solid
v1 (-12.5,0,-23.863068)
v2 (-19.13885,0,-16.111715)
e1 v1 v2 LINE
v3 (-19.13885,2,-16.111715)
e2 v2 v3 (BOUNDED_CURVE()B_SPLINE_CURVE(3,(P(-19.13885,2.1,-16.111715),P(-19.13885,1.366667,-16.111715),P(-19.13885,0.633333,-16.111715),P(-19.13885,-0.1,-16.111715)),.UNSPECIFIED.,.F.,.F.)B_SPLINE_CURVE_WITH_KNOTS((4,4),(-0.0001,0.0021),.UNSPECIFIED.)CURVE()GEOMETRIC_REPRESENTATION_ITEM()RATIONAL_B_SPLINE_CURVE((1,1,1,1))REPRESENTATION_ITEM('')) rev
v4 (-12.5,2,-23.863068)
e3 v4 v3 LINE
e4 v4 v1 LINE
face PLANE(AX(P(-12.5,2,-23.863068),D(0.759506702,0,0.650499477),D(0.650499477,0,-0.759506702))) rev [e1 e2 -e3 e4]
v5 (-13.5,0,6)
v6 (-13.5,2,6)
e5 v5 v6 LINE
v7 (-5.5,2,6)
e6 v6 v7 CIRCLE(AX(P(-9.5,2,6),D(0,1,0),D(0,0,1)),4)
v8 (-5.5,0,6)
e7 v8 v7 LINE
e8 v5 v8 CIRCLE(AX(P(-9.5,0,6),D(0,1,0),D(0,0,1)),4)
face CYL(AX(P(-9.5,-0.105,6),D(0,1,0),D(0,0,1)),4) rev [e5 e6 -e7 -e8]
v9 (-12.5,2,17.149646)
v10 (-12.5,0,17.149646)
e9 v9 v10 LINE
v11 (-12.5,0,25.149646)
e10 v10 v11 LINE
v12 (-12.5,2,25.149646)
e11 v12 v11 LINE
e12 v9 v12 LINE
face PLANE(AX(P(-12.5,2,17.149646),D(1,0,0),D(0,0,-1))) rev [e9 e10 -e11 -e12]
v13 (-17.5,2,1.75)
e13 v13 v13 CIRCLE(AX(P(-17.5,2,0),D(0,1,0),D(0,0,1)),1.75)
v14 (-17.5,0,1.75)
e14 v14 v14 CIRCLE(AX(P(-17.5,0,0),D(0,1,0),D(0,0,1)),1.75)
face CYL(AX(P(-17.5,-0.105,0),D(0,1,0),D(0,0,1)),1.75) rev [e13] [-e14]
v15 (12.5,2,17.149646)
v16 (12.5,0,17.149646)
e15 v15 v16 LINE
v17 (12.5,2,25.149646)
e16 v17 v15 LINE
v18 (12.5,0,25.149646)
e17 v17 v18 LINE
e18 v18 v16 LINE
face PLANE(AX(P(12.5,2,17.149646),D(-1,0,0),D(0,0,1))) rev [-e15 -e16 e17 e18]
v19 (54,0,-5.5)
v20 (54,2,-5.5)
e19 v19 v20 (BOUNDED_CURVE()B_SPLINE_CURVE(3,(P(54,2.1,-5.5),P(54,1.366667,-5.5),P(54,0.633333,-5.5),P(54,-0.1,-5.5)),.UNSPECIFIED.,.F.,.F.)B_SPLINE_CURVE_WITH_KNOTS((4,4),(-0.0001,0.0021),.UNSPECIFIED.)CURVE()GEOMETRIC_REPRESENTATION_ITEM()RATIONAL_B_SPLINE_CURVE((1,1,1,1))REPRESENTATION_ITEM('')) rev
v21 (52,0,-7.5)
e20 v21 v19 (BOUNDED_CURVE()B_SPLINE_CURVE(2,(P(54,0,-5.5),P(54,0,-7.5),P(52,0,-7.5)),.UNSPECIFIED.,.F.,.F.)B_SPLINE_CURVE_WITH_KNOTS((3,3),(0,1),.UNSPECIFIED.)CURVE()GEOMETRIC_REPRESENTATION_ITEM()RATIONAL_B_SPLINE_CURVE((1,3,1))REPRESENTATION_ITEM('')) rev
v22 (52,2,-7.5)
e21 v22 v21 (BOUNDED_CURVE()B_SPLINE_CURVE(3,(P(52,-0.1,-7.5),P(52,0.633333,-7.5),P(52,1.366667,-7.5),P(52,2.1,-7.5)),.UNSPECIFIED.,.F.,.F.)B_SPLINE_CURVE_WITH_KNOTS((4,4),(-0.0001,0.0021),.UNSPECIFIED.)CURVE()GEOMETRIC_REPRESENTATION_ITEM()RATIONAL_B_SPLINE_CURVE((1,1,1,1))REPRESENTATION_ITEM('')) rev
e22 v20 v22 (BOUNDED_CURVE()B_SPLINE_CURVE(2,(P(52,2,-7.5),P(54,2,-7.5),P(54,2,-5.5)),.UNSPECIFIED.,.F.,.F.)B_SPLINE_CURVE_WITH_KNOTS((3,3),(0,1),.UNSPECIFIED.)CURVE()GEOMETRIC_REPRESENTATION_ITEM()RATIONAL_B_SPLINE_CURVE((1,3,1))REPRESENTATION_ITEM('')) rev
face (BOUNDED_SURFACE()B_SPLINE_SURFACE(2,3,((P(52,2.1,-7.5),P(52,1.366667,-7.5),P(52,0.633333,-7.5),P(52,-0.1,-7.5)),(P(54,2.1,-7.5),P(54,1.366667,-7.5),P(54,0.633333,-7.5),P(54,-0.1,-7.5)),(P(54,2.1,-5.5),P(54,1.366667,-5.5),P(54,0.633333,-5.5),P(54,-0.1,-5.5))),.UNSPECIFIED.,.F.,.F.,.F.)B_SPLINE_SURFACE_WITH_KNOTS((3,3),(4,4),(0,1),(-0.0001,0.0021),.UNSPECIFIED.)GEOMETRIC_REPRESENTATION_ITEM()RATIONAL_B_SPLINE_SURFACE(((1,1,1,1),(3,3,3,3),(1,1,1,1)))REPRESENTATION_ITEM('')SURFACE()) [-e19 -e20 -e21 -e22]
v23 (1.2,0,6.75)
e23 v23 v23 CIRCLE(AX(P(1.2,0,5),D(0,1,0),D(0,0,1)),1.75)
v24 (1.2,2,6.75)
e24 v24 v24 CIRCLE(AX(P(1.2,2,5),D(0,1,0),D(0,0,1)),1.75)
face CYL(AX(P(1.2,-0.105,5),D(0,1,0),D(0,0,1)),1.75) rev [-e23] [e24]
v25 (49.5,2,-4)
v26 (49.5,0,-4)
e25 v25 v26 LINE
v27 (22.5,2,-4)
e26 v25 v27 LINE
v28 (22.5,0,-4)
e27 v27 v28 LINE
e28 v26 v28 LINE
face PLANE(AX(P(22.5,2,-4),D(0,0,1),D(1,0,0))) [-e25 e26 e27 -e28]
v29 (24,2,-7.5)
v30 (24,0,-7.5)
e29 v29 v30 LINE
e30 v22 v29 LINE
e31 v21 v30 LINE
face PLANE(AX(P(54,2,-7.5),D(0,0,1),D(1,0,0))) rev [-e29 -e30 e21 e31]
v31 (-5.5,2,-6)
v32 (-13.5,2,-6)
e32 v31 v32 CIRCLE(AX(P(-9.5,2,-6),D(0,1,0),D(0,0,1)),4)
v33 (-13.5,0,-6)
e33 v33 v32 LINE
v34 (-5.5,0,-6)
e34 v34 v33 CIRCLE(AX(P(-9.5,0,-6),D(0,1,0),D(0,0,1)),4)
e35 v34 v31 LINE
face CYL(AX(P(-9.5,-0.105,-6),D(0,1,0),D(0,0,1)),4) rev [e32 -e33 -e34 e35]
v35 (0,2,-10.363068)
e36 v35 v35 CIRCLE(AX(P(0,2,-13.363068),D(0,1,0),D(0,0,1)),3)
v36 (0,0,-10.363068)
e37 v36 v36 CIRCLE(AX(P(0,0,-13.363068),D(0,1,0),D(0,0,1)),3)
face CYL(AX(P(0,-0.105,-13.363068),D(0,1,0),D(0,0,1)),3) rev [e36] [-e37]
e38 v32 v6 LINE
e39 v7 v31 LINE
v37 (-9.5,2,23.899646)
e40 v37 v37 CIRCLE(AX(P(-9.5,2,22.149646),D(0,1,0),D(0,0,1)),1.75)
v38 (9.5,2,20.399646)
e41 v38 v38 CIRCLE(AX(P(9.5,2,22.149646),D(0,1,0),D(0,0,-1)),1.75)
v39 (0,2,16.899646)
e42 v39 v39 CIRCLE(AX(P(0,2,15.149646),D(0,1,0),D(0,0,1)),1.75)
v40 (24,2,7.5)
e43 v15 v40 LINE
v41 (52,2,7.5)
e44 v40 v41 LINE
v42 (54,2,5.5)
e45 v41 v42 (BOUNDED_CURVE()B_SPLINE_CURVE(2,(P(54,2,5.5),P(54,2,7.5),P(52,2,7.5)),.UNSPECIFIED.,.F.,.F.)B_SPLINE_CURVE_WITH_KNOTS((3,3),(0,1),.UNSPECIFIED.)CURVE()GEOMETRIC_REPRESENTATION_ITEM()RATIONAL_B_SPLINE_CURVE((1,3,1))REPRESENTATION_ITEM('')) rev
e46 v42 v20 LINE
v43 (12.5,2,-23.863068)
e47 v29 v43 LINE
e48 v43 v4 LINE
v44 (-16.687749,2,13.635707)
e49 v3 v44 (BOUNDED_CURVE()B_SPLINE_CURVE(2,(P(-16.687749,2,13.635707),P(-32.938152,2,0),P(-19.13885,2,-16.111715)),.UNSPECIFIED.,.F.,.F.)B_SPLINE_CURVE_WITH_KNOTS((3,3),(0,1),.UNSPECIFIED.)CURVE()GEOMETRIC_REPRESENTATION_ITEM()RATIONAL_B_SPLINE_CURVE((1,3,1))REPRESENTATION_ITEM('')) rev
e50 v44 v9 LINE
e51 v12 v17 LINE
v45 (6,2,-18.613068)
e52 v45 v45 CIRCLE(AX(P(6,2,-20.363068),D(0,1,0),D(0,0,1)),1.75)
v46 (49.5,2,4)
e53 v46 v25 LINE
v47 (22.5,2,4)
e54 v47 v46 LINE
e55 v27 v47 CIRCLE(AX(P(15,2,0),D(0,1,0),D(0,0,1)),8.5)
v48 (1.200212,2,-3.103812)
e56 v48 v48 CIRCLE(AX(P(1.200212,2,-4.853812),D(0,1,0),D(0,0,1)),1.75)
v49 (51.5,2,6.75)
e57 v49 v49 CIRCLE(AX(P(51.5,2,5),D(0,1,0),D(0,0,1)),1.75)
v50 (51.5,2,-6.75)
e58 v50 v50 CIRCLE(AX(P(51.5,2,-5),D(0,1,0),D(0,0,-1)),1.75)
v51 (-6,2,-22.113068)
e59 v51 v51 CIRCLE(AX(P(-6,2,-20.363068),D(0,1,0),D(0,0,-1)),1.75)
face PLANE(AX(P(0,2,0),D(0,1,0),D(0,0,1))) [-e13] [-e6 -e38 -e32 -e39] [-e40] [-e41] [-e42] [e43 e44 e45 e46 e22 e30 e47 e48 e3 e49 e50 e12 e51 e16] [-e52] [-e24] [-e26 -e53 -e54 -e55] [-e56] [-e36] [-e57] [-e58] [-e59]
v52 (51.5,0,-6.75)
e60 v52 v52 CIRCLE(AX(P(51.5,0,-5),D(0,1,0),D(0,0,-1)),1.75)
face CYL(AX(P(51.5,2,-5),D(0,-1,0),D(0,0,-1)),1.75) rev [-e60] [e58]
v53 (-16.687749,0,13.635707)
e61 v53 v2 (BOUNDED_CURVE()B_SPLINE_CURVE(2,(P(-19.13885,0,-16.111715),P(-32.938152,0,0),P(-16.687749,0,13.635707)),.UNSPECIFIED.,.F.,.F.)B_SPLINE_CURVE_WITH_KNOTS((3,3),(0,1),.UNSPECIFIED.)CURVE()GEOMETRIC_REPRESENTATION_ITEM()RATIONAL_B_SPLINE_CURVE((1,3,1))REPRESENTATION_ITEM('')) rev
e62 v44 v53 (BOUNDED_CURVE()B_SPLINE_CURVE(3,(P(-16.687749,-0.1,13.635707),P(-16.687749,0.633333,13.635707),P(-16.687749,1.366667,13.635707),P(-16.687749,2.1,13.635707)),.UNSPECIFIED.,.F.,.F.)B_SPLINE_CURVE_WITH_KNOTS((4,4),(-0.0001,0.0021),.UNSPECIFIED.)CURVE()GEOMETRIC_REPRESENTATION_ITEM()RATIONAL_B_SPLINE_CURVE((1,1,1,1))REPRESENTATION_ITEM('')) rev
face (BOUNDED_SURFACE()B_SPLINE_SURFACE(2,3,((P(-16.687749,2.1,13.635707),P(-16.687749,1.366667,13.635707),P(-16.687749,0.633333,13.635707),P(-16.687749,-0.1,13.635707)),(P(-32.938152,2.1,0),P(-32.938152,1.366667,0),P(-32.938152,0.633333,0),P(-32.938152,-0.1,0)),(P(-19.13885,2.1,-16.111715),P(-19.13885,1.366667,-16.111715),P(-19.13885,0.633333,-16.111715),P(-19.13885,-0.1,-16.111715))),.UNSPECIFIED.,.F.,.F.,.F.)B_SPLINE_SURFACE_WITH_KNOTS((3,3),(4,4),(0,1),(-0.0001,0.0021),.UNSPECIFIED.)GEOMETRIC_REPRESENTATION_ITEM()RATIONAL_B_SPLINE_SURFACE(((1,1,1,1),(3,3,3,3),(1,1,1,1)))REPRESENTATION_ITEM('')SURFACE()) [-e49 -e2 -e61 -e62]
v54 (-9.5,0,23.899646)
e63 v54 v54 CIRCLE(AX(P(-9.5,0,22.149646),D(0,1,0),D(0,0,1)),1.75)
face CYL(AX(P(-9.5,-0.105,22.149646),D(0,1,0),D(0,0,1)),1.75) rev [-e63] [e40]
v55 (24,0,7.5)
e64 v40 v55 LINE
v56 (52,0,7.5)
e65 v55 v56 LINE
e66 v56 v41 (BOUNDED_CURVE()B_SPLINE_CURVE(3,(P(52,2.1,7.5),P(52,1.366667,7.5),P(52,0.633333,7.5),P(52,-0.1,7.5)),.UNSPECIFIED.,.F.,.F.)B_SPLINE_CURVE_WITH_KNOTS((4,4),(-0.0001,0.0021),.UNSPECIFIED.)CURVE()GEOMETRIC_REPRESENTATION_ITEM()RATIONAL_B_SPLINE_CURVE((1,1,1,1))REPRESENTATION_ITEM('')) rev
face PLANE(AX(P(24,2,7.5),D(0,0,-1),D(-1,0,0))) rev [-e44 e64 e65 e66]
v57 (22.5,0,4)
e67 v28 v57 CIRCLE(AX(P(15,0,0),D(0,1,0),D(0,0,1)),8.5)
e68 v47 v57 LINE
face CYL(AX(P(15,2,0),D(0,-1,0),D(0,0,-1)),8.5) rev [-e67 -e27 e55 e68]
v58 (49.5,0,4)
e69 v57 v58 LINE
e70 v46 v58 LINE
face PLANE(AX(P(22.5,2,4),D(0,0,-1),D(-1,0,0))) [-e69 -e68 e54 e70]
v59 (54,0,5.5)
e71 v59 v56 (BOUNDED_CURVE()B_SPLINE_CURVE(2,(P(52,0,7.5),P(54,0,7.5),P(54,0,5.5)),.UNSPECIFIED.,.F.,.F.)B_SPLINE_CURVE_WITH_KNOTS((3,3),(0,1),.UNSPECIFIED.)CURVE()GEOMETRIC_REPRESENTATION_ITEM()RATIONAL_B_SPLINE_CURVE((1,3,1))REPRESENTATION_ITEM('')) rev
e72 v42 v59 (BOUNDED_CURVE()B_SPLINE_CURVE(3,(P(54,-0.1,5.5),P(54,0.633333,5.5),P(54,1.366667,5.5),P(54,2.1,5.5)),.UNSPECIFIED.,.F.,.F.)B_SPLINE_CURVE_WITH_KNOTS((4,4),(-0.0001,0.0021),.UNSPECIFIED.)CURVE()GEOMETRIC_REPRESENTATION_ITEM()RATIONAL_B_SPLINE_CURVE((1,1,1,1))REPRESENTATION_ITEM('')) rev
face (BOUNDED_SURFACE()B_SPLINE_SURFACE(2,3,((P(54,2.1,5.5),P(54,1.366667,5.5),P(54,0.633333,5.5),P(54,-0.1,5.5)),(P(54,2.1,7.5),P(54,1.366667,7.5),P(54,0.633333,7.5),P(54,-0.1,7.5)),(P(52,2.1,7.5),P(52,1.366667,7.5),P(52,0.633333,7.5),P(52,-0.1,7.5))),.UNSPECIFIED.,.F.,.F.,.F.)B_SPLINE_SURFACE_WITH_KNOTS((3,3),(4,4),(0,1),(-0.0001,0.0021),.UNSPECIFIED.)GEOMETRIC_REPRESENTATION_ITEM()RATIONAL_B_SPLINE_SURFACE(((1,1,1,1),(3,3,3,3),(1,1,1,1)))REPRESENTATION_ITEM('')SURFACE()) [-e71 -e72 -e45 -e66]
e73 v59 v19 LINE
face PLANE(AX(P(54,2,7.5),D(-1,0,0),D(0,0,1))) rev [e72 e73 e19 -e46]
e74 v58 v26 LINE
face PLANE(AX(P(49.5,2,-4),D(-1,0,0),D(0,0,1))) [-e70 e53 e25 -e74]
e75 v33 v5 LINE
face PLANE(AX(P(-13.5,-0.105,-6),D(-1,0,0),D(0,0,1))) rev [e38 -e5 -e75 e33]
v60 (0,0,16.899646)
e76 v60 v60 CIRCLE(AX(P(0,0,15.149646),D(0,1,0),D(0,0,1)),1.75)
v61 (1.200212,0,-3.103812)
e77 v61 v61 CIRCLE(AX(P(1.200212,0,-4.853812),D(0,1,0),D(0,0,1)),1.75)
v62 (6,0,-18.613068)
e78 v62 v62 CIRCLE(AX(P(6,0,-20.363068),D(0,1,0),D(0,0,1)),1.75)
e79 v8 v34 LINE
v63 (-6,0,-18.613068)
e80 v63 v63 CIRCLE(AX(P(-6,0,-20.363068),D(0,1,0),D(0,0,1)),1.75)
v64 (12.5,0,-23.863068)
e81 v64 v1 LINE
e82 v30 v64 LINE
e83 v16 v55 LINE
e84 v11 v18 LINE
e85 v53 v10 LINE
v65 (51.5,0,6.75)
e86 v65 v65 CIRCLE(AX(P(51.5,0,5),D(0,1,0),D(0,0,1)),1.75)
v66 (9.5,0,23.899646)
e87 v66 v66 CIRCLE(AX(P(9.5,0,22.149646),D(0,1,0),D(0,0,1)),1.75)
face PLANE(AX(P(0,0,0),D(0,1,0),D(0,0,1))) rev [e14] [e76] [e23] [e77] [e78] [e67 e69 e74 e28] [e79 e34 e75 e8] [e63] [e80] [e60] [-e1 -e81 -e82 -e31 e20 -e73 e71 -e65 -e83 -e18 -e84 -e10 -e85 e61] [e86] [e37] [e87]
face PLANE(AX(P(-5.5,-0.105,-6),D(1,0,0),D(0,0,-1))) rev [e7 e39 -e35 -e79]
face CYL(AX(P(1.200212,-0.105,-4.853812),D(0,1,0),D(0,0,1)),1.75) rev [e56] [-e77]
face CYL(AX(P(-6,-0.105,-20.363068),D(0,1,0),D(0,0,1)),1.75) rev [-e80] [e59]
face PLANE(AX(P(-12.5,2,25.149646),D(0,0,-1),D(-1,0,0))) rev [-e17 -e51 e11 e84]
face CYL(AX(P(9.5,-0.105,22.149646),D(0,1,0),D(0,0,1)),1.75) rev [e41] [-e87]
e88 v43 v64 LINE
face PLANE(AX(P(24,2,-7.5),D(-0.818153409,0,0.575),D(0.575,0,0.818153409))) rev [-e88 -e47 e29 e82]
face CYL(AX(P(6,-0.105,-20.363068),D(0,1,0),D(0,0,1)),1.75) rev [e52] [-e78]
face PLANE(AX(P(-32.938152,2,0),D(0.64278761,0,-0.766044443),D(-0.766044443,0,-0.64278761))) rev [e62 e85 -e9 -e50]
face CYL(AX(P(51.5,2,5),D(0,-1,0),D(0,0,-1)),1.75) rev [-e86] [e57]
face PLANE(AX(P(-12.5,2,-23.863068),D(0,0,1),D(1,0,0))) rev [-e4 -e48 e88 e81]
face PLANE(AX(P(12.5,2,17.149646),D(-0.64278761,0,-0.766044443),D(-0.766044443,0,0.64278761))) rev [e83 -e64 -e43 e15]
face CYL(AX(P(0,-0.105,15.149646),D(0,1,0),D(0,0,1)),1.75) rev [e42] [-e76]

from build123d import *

# Parameters (mm, degrees)
SKETCH1_R           = 1.75
BOSS_EXTRUDE1_DEPTH = 2
FILLET3_SIZE        = 2
SKETCH2_R           = 1.75
SKETCH2_R_2         = 3
CUT_EXTRUDE1_DEPTH  = 60.602891692


with BuildPart() as part:
    # Sketch1 → Boss-Extrude1 (new body)
    with BuildSketch(Plane(origin=(0, 0, 0), x_dir=(1, 0, 0), z_dir=(0, 1, 0))):
        Polygon((12.5, -17.149645759), (24, -7.5), (54, -7.5), (54, 7.5), (24, 7.5), (12.5, 23.863068172), (-12.5, 23.863068172), (-32.938151944, 0), (-12.5, -17.149645759), (-12.5, -25.149645759), (12.5, -25.149645759), align=None)
        with Locations(Location((51.5, -5, 0), (0, 0, 270))):
            Circle(SKETCH1_R, mode=Mode.SUBTRACT)
        with Locations(Location((51.5, 5, 0), (0, 0, 90))):
            Circle(SKETCH1_R, mode=Mode.SUBTRACT)
        with BuildLine():
            Line((22.5, 4), (49.5, 4))
            Line((49.5, 4), (49.5, -4))
            Line((49.5, -4), (22.5, -4))
            ThreePointArc((22.5, -4), (6.5, 0), (22.5, 4))
        make_face(mode=Mode.SUBTRACT)
    extrude(amount=BOSS_EXTRUDE1_DEPTH)

    # Fillet2
    # a fillet whose section is not a circle: 21 mm, written as the material it takes off along each edge
    with BuildSketch(Plane(origin=(-32.938151944, -53.033486064, 0), x_dir=(0.650499477323288, 0, -0.7595067017493191), z_dir=(0, 1, 0))) as fillet2_piece_1:
        with BuildLine():
            Bezier((21.213394426, 0), (0, 0), (0.214467683, -21.212310262), weights=[1, 3, 1])
            Line((0.214467683, -21.212310262), (0, 0))
            Line((0, 0), (21.213394426, 0))
        make_face()
    extrude(amount=108.066972128, mode=Mode.SUBTRACT)

    # Fillet3
    # a fillet whose section is not a circle: 2 mm, written as the material it takes off along each edge
    with BuildSketch(Plane(origin=(54, -5, -7.5), x_dir=(0, 0, 1), z_dir=(0, 1, 0)), Plane(origin=(54, -5, 7.5), x_dir=(-1, 0, 0), z_dir=(0, 1, 0))) as fillet3_piece_1:
        with BuildLine():
            Bezier((FILLET3_SIZE, 0), (0, 0), (0, -FILLET3_SIZE), weights=[1, 3, 1])
            Line((0, -FILLET3_SIZE), (0, 0))
            Line((0, 0), (FILLET3_SIZE, 0))
        make_face()
    extrude(amount=12, mode=Mode.SUBTRACT)

    # Sketch2 → Cut-Extrude1 (cut, through all)
    with BuildSketch(Plane(origin=(0, 2, 0), x_dir=(1, 0, 0), z_dir=(0, 1, 0))):
        with Locations(Location((-9.5, -22.149645759, 0), (0, 0, 270))):
            Circle(SKETCH2_R)
        with Locations(Location((9.5, -22.149645759, 0), (0, 0, 270))):
            Circle(SKETCH2_R)
        with Locations(Location((6, 20.363068172, 0), (0, 0, 270))):
            Circle(SKETCH2_R)
        with Locations(Location((-6, 20.363068172, 0), (0, 0, 270))):
            Circle(SKETCH2_R)
        with Locations(Location((0, -15.149645759, 0), (0, 0, 270))):
            Circle(SKETCH2_R)
        with Locations(Location((-17.5, 0, 0), (0, 0, 270))):
            Circle(SKETCH2_R)
        with Locations(Location((1.200212435, 4.853811915, 0), (0, 0, 270))):
            Circle(SKETCH2_R)
        with Locations(Location((0, 13.363068172, 0), (0, 0, 270))):
            Circle(SKETCH2_R_2)
        with Locations(Location((1.2, -5, 0), (0, 0, 270))):
            Circle(SKETCH2_R)
        with BuildLine():
            Line((-5.5, 6), (-5.5, -6))
            ThreePointArc((-5.5, -6), (-9.5, -10), (-13.5, -6))
            Line((-13.5, -6), (-13.5, 6))
            ThreePointArc((-13.5, 6), (-9.5, 10), (-5.5, 6))
        make_face()
    extrude(amount=-CUT_EXTRUDE1_DEPTH, mode=Mode.SUBTRACT)


solid = part.part
